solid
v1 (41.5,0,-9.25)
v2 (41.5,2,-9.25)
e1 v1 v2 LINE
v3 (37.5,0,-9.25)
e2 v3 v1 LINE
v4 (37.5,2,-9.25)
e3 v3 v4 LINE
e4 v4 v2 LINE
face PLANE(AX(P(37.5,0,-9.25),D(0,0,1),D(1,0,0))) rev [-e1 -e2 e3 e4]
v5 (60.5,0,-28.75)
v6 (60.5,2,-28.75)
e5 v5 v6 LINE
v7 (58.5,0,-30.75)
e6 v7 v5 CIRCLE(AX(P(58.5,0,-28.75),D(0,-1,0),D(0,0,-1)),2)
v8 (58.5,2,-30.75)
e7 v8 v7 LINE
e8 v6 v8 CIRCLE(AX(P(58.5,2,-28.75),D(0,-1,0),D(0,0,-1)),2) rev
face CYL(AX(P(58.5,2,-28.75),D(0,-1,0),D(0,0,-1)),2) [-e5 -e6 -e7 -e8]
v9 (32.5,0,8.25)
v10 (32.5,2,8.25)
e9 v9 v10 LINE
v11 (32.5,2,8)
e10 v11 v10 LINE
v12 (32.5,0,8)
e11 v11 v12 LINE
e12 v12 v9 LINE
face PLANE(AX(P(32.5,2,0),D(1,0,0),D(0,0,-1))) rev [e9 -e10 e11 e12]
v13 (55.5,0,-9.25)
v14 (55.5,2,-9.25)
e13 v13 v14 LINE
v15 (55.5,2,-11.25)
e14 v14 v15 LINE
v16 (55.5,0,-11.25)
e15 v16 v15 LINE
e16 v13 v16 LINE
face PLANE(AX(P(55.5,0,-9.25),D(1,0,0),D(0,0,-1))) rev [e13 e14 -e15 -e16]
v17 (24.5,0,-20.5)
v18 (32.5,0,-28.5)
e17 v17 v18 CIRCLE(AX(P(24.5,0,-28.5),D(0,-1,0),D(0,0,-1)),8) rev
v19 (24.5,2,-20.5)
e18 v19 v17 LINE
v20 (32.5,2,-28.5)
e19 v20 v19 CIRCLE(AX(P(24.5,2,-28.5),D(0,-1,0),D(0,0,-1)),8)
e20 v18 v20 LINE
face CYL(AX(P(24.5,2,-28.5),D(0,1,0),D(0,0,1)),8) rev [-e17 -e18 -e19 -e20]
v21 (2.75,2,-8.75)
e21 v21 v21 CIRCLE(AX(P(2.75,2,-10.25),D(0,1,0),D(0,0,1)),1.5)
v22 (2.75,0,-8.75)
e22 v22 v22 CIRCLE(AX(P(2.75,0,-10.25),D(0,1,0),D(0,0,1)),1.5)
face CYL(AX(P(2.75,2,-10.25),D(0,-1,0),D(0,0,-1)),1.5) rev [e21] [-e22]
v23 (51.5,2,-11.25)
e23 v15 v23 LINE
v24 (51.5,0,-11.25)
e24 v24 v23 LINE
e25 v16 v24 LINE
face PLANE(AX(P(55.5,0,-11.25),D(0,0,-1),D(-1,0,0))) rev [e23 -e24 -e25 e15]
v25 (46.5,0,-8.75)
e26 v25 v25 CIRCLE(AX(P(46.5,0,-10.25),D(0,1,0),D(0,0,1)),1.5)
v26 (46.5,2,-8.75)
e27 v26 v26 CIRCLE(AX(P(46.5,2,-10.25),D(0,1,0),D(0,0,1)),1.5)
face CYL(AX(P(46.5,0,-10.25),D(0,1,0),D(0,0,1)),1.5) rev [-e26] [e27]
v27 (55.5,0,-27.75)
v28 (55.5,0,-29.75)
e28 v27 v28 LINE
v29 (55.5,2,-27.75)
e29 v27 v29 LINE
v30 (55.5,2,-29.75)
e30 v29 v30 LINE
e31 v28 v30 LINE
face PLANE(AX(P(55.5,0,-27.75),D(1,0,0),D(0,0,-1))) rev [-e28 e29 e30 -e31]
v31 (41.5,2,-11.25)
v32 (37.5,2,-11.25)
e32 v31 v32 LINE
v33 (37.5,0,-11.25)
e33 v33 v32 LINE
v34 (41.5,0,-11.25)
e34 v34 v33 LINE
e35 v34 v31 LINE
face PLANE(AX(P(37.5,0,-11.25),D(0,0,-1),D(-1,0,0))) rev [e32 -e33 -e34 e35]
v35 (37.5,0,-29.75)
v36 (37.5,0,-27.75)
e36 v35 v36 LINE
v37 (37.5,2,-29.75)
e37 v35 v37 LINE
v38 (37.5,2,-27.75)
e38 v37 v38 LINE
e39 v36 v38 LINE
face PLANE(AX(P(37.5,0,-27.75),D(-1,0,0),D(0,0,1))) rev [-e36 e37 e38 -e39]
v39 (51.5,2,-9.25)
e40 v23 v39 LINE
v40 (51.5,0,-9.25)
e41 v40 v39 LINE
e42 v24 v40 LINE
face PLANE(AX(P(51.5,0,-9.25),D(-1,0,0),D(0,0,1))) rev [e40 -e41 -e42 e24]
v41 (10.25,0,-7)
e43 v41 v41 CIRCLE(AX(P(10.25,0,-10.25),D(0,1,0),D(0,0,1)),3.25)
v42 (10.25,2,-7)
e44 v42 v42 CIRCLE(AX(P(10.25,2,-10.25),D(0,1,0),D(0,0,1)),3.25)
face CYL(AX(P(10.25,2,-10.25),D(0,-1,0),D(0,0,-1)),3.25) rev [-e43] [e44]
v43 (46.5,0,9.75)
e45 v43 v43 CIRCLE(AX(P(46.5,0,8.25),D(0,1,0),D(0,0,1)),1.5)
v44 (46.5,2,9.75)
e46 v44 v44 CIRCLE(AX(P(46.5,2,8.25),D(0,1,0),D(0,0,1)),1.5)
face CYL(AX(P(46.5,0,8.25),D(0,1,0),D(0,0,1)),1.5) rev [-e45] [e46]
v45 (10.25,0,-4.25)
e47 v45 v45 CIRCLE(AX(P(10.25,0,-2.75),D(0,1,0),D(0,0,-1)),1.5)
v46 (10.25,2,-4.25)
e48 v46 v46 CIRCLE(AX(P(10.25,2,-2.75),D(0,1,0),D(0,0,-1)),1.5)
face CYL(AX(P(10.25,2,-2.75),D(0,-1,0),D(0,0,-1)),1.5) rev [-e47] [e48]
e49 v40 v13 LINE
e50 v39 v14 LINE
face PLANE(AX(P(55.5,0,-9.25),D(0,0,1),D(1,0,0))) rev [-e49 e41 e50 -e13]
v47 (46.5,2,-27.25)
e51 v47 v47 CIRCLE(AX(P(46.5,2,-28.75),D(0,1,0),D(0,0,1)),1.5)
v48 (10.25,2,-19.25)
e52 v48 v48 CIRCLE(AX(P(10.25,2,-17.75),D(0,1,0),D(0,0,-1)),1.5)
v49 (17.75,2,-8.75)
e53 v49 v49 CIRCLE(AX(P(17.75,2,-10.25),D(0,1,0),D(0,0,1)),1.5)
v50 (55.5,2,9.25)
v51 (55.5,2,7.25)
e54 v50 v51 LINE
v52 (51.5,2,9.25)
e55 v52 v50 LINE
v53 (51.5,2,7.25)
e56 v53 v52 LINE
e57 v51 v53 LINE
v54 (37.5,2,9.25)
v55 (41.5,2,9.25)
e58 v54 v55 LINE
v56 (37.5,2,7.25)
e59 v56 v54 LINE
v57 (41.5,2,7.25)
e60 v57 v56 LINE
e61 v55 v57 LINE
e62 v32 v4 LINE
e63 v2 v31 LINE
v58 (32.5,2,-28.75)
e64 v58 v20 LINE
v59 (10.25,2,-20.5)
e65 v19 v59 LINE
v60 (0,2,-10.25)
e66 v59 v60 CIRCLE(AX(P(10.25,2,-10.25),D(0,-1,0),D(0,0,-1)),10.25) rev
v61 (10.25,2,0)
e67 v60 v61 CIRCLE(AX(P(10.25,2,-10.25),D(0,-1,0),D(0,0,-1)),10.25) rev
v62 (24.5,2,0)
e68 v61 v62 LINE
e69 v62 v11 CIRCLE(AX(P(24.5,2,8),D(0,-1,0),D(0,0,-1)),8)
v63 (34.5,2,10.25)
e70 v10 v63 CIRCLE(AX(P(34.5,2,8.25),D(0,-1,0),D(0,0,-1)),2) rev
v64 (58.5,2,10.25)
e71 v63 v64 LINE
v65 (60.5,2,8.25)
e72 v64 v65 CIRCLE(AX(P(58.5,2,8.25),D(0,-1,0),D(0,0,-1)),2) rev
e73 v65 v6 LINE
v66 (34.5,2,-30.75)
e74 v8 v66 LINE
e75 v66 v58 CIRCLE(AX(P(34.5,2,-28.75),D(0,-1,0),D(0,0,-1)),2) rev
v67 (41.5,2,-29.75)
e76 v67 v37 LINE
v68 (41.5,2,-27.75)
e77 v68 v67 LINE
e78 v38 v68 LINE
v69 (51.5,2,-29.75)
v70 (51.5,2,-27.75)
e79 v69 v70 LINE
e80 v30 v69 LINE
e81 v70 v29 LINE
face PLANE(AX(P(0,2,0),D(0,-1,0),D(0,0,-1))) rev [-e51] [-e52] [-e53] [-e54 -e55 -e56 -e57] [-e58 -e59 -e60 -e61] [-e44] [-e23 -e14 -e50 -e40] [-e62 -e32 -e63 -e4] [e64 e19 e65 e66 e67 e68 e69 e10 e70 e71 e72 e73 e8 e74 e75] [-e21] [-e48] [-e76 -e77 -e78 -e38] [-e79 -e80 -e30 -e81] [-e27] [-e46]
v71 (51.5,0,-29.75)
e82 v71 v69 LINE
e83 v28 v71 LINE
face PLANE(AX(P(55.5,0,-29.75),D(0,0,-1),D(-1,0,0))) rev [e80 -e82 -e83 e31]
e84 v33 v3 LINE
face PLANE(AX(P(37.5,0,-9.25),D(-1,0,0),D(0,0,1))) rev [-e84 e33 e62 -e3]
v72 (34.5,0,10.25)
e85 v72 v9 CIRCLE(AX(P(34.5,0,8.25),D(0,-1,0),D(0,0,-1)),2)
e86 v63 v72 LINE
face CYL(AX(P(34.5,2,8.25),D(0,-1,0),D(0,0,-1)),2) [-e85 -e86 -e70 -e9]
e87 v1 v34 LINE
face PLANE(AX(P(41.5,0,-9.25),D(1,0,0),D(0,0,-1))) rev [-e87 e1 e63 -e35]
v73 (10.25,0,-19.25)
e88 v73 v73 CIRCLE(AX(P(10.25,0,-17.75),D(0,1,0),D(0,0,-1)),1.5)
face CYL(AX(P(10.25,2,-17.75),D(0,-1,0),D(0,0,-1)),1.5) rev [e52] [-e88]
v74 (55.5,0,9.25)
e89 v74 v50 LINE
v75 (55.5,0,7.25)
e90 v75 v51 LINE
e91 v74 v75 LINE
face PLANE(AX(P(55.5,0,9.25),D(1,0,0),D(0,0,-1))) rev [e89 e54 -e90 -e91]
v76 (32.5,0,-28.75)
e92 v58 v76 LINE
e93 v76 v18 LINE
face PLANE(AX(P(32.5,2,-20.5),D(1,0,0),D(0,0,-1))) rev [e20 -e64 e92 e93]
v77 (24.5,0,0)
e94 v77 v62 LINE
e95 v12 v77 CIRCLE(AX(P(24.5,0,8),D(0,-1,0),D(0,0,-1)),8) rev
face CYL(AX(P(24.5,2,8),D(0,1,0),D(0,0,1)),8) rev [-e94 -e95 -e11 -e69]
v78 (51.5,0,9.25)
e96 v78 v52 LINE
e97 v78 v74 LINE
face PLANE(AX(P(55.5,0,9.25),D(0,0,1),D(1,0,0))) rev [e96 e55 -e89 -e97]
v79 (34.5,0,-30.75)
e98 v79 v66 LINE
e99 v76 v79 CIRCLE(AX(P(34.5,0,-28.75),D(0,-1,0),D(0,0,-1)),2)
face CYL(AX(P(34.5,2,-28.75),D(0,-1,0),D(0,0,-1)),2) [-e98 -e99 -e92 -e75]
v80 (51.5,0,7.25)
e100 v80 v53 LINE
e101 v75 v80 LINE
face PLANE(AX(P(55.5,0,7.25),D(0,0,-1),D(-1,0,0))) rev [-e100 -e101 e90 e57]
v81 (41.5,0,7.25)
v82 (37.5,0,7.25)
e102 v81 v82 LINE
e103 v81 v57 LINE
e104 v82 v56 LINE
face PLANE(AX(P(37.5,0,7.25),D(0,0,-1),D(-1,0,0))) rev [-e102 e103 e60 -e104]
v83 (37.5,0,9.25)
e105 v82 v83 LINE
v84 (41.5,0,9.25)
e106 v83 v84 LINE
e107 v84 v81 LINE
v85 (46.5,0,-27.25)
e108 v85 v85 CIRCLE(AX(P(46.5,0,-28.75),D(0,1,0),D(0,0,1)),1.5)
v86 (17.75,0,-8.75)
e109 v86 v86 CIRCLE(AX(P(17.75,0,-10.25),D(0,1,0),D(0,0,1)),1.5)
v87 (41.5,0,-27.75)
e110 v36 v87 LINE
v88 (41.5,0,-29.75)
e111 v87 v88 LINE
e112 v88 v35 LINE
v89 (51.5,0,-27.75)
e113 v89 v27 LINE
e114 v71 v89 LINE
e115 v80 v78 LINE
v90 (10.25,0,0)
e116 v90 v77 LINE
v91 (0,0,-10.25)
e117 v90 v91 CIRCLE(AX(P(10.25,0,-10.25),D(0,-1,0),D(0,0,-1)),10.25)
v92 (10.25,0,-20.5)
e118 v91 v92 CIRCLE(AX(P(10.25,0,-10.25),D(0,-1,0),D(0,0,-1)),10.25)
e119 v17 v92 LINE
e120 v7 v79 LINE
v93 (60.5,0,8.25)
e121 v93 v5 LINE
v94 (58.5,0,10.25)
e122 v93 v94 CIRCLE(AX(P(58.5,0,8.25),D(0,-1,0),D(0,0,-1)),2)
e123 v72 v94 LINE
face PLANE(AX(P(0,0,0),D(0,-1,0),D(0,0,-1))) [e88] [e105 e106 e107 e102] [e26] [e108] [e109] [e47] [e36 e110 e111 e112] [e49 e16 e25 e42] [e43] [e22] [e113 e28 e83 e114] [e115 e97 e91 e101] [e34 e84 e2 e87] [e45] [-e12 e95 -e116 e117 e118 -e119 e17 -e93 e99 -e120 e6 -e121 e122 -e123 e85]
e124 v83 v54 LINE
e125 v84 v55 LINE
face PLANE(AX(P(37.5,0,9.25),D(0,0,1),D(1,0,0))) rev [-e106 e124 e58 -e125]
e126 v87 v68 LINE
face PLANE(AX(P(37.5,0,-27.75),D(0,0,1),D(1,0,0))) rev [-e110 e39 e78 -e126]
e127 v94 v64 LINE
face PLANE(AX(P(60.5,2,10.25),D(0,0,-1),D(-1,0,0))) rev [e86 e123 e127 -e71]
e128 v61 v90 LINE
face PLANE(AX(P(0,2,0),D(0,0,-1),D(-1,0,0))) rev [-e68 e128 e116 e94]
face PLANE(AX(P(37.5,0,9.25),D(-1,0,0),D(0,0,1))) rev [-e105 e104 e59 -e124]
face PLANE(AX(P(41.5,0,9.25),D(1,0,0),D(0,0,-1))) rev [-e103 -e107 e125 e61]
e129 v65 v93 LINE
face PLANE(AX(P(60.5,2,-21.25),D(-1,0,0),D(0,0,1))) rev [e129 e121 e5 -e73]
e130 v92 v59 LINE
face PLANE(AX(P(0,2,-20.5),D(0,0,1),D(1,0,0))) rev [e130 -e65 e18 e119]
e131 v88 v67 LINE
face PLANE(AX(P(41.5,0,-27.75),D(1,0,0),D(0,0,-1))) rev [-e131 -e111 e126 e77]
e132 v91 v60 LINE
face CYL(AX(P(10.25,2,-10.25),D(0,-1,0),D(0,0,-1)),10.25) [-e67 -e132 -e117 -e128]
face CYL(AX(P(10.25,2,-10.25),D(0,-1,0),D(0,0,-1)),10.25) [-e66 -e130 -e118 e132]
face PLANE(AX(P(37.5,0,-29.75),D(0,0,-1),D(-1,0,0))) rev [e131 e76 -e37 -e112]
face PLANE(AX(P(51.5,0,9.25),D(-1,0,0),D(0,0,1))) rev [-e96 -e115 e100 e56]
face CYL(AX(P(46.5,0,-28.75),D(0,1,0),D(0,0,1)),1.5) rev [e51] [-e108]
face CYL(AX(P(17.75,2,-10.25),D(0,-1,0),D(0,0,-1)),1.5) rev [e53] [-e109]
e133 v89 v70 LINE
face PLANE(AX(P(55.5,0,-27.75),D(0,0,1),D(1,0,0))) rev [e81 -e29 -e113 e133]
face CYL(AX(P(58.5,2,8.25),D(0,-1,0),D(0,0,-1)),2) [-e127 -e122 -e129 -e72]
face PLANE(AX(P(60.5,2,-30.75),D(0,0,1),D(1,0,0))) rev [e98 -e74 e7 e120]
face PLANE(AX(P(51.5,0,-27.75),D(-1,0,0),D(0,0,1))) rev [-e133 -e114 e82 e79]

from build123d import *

# Parameters (mm, degrees)
SKETCH1_R           = 3.25
SKETCH1_R_2         = 1.5
BOSS_EXTRUDE1_DEPTH = 2
FILLET1_R           = 10.25
FILLET2_R           = 2
SKETCH2_R           = 1.5
SKETCH2_W           = 4
SKETCH2_H           = 2
CUT_EXTRUDE1_DEPTH  = 2
FILLET3_R           = 8


with BuildPart() as part:
    # Sketch1 → Boss-Extrude1 (new body)
    with BuildSketch(Plane(origin=(0, 0, 0), x_dir=(1, 0, 0), z_dir=(0, 1, 0))):
        Polygon((0, 0), (32.5, 0), (32.5, -10.25), (60.5, -10.25), (60.5, -0.75), (60.5, 21.25), (60.5, 30.75), (32.5, 30.75), (32.5, 20.5), (0, 20.5), align=None)
        with Locations(Location((10.25, 10.25, 0), (0, 0, 270))):
            Circle(SKETCH1_R, mode=Mode.SUBTRACT)
        with Locations(Location((2.75, 10.25, 0), (0, 0, 270))):
            Circle(SKETCH1_R_2, mode=Mode.SUBTRACT)
        with Locations(Location((10.25, 17.75, 0), (0, 0, 90))):
            Circle(SKETCH1_R_2, mode=Mode.SUBTRACT)
        with Locations(Location((17.75, 10.25, 0), (0, 0, 270))):
            Circle(SKETCH1_R_2, mode=Mode.SUBTRACT)
        with Locations(Location((10.25, 2.75, 0), (0, 0, 90))):
            Circle(SKETCH1_R_2, mode=Mode.SUBTRACT)
    extrude(amount=BOSS_EXTRUDE1_DEPTH)

    # Fillet1
    fillet1_edges = [part.edges().sort_by_distance(p)[0] for p in [
        (0, 1, -20.5),
        (0, 1, 0),
    ]]
    fillet(fillet1_edges, radius=FILLET1_R - 0.0001)  # a hair under: the kernel refuses the full size

    # Fillet2
    fillet2_edges = [part.edges().sort_by_distance(p)[0] for p in [
        (32.5, 1, -30.75),
        (60.5, 1, -30.75),
        (60.5, 1, 10.25),
        (32.5, 1, 10.25),
    ]]
    fillet(fillet2_edges, radius=FILLET2_R)

    # Sketch2 → Cut-Extrude1 (cut)
    with BuildSketch(Plane(origin=(0, 2, 0), x_dir=(1, 0, 0), z_dir=(0, 1, 0))):
        with Locations(Location((46.5, 28.75, 0), (0, 0, 270))):
            Circle(SKETCH2_R)
        with Locations(Location((46.5, 10.25, 0), (0, 0, 270))):
            Circle(SKETCH2_R)
        with Locations(Location((46.5, -8.25, 0), (0, 0, 270))):
            Circle(SKETCH2_R)
        with Locations((39.5, 28.75)):
            Rectangle(SKETCH2_W, SKETCH2_H)
        with Locations((53.5, 28.75)):
            Rectangle(SKETCH2_W, SKETCH2_H)
        with Locations((39.5, 10.25)):
            Rectangle(SKETCH2_W, SKETCH2_H)
        with Locations((53.5, 10.25)):
            Rectangle(SKETCH2_W, SKETCH2_H)
        with Locations((39.5, -8.25)):
            Rectangle(SKETCH2_W, SKETCH2_H)
        with Locations((53.5, -8.25)):
            Rectangle(SKETCH2_W, SKETCH2_H)
    extrude(amount=-CUT_EXTRUDE1_DEPTH, mode=Mode.SUBTRACT)

    # Fillet3
    fillet3_edges = [part.edges().sort_by_distance(p)[0] for p in [
        (32.5, 1, -20.5),
        (32.5, 1, 0),
    ]]
    fillet(fillet3_edges, radius=FILLET3_R)


solid = part.part
